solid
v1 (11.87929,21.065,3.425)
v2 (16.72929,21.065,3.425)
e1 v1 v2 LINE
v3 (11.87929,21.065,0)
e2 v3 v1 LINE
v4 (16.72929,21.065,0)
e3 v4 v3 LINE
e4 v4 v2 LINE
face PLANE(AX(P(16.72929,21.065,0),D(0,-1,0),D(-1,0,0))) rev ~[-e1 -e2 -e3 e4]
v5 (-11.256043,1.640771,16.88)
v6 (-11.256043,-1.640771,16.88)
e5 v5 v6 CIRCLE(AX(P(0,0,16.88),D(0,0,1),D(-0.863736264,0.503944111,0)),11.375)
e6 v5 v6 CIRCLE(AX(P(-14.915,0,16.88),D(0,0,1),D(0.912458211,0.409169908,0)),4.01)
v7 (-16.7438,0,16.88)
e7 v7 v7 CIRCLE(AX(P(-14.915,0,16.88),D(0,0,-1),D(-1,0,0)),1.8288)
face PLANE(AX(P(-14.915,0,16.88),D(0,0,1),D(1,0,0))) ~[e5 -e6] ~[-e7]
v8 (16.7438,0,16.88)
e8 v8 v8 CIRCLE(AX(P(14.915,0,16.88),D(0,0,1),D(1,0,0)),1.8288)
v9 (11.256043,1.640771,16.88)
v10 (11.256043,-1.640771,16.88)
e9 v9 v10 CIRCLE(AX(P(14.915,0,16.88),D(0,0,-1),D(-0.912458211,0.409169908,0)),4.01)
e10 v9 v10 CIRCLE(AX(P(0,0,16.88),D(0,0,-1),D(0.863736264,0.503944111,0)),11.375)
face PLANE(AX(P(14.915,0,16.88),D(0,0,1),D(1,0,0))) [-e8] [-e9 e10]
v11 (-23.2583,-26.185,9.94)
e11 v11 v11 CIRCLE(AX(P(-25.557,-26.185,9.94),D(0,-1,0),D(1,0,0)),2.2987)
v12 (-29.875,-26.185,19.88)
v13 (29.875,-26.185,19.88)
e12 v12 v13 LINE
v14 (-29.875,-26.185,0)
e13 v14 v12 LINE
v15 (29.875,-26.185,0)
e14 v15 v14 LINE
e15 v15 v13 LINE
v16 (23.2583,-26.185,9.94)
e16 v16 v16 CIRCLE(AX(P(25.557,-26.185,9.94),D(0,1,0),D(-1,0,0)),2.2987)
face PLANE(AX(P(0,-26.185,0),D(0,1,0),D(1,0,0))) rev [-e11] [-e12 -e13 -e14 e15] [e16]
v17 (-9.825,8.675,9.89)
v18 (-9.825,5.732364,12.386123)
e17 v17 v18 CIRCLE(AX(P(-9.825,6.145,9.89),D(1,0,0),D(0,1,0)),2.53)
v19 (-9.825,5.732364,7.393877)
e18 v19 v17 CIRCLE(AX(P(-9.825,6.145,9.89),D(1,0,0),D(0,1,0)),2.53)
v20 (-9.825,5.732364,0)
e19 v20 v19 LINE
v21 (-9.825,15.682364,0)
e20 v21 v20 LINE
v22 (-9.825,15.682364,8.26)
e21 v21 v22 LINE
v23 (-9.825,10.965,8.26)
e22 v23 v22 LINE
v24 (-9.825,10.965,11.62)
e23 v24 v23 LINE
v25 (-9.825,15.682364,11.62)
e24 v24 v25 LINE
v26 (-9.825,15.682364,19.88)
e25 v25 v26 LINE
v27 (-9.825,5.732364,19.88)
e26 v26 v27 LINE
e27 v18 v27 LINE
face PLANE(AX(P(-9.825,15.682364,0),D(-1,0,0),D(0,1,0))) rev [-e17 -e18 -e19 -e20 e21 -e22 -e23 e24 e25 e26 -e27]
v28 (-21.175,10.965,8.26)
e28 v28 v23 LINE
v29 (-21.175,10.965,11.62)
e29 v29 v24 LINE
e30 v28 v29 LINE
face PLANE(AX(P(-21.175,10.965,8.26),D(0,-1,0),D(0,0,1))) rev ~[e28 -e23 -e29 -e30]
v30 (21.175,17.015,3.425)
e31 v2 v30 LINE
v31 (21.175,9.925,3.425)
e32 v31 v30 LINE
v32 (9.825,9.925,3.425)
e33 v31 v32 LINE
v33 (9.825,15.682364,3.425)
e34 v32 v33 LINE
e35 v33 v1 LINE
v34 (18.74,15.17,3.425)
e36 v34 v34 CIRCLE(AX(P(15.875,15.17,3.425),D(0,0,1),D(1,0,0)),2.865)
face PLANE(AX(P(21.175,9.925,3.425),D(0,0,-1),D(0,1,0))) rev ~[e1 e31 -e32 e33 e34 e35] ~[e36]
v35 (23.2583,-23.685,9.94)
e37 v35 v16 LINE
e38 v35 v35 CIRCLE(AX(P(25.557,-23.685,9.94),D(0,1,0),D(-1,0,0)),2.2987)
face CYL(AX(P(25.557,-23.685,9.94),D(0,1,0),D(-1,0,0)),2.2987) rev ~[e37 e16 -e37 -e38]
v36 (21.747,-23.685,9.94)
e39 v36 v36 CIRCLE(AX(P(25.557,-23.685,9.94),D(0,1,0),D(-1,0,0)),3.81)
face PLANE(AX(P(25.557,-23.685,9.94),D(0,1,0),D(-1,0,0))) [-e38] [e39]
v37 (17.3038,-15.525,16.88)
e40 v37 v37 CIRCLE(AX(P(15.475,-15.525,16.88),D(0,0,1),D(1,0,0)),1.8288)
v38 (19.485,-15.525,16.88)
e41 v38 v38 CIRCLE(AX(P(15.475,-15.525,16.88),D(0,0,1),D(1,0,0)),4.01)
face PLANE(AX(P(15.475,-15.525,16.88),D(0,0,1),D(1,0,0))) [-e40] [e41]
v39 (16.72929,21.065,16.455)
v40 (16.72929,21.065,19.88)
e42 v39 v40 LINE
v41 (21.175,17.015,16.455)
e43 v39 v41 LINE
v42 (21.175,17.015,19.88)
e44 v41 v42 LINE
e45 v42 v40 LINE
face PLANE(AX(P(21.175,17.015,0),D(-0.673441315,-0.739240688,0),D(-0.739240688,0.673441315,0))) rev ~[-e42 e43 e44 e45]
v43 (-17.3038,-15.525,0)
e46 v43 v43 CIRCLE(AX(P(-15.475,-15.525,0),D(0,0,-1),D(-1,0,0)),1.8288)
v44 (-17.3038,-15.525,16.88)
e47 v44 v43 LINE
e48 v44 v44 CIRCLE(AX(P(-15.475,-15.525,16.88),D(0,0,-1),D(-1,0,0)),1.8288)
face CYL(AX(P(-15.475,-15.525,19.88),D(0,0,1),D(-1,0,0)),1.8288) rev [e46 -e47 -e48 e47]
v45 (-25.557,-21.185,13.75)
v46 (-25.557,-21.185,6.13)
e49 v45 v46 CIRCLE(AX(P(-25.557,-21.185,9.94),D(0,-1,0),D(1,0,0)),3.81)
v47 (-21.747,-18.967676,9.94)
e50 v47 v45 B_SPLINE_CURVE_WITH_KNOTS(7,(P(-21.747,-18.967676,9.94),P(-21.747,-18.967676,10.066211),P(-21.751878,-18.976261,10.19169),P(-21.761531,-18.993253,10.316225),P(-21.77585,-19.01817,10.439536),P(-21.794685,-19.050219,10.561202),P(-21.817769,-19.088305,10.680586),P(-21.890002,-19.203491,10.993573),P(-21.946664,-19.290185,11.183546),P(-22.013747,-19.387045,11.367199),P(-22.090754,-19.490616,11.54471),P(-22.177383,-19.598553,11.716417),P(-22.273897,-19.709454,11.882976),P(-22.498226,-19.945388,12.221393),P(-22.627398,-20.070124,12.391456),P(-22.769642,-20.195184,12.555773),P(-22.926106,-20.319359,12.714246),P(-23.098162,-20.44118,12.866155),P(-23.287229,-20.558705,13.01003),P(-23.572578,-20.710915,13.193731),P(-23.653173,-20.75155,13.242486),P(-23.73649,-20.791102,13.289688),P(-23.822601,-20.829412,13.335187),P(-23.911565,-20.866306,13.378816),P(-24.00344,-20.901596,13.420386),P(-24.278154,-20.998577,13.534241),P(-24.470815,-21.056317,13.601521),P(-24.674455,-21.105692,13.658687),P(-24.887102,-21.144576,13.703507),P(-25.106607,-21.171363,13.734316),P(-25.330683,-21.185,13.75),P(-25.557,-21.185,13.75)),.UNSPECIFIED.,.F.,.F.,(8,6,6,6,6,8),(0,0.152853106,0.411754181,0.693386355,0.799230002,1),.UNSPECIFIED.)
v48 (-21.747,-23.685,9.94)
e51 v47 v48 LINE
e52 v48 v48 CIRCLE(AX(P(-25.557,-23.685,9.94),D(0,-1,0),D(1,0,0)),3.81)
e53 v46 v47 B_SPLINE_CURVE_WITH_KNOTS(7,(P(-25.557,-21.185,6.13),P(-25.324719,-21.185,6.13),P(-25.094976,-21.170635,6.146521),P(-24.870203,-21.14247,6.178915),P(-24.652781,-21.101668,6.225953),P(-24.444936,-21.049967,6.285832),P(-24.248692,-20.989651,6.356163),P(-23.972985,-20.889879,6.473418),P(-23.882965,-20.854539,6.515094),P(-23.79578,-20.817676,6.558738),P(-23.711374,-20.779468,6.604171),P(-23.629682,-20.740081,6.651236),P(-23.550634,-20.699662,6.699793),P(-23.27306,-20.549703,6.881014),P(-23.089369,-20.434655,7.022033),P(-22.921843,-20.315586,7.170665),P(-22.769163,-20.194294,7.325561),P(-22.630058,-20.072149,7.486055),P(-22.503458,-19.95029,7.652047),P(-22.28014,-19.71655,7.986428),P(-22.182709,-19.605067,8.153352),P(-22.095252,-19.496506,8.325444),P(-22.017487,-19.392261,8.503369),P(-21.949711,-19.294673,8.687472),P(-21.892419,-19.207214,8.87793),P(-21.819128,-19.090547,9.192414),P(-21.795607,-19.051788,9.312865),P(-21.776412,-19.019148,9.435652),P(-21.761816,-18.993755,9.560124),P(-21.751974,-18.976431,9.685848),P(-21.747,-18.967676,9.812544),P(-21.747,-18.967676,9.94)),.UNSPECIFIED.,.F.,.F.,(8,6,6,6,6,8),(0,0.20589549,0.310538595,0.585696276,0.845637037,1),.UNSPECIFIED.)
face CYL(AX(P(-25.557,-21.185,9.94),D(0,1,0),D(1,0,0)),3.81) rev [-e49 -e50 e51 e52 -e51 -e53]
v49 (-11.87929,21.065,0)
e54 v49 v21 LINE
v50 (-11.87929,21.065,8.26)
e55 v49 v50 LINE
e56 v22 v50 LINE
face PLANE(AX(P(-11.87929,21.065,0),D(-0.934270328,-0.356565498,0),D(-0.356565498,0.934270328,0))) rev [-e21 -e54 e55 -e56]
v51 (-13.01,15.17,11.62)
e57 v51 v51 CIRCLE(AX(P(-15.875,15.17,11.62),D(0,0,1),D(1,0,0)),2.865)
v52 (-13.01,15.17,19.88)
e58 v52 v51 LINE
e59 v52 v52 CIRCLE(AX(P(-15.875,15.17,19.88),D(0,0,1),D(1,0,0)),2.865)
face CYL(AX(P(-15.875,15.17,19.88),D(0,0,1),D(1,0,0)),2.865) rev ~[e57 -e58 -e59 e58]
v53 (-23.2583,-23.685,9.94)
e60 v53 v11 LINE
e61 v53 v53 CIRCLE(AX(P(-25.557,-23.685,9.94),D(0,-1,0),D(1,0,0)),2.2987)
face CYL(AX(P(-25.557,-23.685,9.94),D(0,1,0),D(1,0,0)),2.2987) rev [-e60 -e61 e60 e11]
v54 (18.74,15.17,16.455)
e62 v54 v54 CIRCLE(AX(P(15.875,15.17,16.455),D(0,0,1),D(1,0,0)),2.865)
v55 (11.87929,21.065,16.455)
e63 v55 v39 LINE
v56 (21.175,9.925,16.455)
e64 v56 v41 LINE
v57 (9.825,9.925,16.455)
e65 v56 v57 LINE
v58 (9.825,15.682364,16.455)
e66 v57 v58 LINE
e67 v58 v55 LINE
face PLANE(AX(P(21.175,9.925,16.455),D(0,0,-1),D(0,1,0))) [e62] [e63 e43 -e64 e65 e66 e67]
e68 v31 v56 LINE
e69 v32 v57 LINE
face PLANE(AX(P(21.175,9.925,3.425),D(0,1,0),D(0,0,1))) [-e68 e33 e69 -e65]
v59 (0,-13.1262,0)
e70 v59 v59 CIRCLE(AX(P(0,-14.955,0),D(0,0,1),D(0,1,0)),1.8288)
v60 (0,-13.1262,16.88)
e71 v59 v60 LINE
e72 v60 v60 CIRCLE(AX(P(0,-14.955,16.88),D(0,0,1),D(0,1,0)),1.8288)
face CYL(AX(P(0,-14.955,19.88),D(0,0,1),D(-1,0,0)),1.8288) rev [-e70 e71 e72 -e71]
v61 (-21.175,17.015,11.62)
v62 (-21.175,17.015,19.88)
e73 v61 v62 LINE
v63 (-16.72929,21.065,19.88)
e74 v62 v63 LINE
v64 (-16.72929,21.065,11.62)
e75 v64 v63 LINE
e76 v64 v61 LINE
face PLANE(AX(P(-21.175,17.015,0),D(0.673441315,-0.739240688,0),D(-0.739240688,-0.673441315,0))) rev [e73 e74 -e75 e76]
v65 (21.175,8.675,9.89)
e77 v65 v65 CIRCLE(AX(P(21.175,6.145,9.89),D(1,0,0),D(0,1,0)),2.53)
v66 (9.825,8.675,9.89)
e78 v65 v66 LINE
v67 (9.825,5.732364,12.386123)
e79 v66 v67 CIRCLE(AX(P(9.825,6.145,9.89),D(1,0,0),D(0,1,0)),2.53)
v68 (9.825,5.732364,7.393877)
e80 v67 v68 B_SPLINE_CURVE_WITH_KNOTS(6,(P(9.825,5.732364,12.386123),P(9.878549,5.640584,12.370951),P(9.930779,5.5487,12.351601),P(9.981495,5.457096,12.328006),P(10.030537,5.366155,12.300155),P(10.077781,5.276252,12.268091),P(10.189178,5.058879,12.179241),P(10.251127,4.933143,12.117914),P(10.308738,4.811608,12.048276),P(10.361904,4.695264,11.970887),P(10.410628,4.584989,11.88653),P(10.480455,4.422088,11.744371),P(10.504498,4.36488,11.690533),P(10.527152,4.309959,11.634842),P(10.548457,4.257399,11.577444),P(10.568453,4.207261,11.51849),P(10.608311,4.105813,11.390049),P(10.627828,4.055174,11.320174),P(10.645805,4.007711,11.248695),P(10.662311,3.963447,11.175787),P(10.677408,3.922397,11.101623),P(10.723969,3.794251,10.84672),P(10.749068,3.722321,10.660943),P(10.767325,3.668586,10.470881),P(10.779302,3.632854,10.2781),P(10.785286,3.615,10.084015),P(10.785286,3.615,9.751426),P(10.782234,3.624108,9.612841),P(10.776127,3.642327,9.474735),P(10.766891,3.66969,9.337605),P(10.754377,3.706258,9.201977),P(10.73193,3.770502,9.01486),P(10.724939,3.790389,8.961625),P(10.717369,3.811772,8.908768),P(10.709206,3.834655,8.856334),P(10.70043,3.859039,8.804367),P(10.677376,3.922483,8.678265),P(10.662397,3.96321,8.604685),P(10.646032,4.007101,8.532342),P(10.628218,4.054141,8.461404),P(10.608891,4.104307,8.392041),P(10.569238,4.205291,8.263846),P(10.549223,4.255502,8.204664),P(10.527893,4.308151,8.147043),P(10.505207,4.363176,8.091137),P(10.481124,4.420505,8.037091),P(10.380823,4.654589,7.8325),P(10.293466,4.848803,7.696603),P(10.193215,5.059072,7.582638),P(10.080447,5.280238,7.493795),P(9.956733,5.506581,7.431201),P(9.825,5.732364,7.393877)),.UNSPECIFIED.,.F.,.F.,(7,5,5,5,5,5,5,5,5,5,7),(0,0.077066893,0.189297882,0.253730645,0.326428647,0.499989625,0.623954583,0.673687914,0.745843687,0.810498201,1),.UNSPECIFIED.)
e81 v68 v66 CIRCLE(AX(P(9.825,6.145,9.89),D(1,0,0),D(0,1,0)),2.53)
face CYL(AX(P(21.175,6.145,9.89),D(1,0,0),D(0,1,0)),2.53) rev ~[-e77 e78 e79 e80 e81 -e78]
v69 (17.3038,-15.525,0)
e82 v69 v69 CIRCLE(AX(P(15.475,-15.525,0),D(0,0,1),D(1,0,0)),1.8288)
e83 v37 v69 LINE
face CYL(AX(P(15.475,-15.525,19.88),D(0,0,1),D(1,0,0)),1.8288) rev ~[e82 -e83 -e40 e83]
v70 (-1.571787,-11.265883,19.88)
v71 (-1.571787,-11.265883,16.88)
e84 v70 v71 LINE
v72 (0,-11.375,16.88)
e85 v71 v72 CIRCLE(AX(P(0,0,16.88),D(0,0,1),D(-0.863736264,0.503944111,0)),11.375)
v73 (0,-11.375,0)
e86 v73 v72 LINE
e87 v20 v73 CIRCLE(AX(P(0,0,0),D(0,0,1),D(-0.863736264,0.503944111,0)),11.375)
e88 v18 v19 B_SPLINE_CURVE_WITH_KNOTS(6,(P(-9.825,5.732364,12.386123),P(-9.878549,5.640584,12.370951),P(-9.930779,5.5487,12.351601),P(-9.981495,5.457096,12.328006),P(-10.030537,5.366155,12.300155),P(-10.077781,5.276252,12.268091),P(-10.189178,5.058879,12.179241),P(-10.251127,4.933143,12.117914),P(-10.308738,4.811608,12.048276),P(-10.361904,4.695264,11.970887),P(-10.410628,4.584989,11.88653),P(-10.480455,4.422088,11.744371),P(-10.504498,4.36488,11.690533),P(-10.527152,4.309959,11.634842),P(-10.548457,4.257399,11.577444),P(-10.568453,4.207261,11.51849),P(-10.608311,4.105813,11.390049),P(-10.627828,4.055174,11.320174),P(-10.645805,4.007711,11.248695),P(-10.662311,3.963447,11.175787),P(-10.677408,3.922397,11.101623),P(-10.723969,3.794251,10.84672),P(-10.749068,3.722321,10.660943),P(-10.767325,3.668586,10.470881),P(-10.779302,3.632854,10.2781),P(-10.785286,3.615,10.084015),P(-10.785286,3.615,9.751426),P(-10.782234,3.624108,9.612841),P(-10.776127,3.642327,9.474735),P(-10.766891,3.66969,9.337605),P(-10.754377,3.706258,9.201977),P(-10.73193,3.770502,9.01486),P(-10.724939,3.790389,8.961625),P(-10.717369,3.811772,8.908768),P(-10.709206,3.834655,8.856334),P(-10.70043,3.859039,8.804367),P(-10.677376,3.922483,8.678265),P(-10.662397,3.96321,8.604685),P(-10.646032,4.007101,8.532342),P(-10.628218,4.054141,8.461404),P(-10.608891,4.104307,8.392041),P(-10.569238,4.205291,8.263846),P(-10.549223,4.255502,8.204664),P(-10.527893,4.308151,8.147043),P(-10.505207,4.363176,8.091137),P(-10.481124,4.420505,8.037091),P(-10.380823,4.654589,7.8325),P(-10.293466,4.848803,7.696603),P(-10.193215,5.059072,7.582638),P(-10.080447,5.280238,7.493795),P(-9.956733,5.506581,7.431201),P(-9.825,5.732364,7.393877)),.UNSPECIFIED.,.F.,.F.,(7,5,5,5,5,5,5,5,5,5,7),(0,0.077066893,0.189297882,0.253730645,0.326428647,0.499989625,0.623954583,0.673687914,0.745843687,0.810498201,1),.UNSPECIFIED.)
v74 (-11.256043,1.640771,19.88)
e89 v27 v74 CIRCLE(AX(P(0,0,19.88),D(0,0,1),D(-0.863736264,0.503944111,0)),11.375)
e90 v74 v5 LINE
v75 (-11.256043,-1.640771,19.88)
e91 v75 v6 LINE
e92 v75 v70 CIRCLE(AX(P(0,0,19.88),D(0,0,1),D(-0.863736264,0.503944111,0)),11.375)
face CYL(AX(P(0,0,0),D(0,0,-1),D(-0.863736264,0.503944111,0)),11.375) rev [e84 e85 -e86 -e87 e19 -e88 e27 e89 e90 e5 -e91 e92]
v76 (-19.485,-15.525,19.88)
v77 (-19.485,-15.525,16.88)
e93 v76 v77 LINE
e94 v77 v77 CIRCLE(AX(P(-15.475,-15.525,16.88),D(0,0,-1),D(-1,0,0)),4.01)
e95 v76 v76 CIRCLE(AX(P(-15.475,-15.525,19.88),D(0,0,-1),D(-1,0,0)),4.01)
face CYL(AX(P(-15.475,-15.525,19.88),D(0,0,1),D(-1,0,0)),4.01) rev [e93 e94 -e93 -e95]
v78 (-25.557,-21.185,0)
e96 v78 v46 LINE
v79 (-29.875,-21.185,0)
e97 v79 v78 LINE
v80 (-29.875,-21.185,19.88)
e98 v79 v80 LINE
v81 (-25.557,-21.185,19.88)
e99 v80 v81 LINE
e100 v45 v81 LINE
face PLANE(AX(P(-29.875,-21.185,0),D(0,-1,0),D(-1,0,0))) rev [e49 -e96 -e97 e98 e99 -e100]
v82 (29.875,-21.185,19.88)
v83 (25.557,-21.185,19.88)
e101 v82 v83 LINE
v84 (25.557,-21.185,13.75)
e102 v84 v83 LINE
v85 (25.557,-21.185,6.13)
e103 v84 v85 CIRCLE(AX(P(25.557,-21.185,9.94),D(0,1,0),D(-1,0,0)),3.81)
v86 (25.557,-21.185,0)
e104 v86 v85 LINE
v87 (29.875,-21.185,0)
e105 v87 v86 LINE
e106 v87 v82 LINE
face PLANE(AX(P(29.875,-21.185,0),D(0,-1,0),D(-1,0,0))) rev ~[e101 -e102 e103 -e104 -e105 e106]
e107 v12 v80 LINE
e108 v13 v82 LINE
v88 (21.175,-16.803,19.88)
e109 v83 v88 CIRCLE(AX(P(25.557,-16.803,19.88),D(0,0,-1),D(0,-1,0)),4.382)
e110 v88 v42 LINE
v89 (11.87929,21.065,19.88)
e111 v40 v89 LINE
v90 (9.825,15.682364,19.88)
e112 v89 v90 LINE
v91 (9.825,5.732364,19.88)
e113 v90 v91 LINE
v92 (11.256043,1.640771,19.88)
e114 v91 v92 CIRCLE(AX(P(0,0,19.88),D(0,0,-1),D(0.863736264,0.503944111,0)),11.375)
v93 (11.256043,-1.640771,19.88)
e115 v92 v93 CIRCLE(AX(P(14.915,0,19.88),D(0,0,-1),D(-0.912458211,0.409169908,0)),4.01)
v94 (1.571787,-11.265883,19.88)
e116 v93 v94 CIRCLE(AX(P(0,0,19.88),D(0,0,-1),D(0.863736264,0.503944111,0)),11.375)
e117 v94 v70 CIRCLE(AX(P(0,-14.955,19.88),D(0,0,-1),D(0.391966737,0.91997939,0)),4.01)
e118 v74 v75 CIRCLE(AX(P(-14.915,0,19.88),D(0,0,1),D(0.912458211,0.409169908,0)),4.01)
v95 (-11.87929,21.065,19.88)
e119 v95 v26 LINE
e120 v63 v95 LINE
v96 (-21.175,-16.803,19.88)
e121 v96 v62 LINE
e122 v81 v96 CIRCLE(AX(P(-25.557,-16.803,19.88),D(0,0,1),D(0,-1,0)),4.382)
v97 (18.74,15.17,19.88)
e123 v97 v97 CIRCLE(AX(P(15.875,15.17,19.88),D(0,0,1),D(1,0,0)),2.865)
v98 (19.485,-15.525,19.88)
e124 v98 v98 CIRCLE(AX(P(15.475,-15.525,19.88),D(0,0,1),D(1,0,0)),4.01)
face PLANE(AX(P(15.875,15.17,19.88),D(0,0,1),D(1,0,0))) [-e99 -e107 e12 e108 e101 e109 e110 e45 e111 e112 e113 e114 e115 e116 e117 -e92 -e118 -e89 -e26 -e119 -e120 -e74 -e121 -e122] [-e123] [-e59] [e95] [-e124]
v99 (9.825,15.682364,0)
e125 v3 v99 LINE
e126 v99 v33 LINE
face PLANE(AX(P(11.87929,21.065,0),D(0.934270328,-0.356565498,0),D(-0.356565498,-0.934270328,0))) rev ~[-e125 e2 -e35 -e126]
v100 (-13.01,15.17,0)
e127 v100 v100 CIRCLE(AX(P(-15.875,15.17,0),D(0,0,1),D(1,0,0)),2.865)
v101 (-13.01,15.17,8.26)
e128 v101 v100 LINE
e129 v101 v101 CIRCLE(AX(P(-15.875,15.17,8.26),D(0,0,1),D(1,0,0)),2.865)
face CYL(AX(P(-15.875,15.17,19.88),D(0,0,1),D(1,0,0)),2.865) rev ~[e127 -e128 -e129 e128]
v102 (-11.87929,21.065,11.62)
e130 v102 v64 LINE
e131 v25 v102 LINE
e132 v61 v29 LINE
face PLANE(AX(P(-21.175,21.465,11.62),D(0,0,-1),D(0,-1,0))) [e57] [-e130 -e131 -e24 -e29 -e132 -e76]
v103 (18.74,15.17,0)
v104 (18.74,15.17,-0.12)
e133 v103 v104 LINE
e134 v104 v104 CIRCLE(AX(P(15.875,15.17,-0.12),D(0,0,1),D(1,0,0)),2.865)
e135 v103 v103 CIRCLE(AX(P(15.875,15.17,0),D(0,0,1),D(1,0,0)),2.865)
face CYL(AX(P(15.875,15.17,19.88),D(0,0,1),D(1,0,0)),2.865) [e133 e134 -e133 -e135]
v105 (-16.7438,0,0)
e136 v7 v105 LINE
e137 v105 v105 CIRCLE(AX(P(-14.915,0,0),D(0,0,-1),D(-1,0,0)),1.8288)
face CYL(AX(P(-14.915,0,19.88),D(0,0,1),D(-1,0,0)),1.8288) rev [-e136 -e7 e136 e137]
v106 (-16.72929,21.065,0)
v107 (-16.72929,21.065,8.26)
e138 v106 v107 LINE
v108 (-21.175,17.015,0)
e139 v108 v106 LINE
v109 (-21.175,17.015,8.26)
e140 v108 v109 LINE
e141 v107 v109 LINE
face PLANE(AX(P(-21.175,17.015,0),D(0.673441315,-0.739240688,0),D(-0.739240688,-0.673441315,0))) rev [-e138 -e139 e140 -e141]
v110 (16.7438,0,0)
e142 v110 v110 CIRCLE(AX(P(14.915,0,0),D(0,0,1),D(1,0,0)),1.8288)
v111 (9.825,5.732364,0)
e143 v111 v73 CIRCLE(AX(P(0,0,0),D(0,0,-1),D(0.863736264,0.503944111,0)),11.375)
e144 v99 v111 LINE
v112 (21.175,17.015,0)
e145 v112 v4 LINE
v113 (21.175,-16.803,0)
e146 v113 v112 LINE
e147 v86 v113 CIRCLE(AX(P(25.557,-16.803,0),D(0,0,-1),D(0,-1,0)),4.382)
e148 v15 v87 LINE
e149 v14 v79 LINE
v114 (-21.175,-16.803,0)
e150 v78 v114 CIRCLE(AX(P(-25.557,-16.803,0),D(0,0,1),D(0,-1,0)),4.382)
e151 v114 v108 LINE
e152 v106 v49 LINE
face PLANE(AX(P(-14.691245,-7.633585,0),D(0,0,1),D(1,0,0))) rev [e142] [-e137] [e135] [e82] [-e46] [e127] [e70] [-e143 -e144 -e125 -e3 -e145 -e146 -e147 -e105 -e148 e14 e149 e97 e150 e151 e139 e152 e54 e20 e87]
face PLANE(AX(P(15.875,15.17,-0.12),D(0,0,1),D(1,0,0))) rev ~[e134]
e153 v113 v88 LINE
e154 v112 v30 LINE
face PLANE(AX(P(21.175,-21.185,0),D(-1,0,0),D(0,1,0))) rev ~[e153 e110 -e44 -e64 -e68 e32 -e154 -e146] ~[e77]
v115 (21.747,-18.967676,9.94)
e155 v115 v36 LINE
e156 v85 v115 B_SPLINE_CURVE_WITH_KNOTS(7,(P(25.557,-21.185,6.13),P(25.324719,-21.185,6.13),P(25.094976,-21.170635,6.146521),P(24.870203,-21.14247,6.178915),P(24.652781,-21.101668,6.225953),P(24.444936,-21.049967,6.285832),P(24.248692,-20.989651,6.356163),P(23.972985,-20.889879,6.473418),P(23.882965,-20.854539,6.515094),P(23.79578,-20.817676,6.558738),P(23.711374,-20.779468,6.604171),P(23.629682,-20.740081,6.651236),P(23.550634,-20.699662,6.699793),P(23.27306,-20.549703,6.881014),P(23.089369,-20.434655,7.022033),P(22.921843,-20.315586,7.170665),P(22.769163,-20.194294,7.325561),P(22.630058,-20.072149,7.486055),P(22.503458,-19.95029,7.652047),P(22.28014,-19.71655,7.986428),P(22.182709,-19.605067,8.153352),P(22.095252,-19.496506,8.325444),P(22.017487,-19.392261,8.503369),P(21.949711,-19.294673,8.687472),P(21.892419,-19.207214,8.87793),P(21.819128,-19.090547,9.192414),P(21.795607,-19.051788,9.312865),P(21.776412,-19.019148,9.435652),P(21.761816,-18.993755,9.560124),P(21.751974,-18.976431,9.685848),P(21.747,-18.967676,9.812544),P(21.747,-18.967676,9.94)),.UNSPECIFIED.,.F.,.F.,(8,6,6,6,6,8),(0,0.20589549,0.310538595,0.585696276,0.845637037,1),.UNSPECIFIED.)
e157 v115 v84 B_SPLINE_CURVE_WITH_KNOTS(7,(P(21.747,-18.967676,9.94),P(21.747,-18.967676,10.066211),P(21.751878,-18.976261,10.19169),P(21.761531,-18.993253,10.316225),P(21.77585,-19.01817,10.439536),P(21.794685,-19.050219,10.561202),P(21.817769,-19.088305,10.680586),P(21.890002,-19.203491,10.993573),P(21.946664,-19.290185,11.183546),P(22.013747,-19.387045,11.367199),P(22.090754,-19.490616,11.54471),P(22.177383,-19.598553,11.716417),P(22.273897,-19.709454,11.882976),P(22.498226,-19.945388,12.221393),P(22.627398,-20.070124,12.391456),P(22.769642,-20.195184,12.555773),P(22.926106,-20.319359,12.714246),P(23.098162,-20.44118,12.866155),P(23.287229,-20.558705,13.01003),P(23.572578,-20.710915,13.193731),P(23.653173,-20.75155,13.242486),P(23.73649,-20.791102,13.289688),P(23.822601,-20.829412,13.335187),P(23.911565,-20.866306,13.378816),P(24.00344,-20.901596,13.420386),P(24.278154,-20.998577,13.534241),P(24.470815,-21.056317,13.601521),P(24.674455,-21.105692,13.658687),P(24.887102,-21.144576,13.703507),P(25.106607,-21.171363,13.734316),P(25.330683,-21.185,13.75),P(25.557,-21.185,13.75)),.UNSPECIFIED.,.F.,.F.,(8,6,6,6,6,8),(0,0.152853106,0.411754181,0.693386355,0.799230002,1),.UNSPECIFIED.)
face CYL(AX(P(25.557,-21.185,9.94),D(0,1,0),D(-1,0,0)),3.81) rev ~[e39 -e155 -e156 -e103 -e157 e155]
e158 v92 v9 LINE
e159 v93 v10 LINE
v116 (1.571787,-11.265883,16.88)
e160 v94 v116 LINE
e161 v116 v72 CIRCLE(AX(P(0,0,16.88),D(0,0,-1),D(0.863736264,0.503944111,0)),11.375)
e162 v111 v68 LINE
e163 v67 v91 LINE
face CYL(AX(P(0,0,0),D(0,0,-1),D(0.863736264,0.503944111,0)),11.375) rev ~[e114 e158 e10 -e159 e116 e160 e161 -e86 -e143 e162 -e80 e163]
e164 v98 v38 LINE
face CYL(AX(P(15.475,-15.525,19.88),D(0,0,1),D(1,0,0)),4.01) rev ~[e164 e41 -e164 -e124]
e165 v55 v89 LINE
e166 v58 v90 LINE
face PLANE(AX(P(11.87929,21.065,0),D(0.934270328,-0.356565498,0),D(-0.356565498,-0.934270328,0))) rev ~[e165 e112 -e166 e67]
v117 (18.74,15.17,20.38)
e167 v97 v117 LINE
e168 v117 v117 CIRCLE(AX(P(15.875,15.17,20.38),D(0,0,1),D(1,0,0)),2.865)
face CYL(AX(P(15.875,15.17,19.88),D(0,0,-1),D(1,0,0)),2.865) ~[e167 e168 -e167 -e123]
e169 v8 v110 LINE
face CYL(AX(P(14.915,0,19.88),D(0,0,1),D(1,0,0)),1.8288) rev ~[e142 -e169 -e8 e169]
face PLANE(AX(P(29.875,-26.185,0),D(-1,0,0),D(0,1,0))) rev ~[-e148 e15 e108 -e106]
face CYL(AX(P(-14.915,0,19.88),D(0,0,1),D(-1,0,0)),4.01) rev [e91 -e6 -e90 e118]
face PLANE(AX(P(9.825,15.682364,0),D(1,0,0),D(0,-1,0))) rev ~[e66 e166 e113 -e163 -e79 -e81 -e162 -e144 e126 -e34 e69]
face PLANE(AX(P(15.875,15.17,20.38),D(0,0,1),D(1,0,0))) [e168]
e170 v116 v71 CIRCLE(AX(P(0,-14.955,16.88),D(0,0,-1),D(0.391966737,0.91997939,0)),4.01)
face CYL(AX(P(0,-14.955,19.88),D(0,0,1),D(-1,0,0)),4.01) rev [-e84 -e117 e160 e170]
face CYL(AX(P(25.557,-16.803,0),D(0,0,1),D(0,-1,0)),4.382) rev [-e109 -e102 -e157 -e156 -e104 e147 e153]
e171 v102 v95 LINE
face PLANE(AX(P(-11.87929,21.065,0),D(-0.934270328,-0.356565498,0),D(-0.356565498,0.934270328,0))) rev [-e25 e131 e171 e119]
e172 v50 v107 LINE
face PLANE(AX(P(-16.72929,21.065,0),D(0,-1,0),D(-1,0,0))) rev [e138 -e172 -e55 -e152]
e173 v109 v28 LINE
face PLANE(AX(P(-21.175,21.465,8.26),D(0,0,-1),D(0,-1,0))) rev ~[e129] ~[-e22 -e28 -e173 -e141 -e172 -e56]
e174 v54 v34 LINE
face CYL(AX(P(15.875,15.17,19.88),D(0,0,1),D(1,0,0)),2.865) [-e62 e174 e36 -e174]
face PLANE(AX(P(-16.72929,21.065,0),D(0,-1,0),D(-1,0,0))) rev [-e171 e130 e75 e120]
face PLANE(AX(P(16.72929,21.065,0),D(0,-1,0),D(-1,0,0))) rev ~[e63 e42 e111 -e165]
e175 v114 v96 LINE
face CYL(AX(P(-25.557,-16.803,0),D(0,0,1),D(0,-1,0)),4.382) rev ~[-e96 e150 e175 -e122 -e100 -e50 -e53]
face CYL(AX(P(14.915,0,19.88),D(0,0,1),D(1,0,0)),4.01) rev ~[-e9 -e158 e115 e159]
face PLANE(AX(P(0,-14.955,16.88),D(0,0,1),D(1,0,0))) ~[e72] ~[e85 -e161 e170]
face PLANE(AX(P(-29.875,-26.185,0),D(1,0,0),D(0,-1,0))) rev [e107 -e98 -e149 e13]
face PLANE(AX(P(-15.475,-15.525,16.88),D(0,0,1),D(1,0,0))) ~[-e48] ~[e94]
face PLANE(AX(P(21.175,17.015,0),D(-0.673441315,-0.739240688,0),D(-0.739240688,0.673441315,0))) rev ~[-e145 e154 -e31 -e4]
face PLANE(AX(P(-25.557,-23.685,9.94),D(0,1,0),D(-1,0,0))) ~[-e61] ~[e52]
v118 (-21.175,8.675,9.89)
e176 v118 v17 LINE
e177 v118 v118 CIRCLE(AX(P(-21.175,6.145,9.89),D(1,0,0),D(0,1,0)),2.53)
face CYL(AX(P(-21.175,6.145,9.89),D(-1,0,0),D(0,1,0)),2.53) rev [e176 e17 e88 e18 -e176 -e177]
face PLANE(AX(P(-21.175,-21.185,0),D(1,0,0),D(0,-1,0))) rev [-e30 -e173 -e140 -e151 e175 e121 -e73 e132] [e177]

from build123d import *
from build123d import SkipClean  # not in build123d's __all__

# Parameters (mm, degrees)
F1_DEPTH       = 19.88
F2_R           = 4.382
F3_R           = 3.81
F4_DEPTH       = 2.5
F4_DEPTH_BACK  = 5
F5_R           = 2.2987
F6_DEPTH       = 2.501
F7_R           = 4.01
F8_DEPTH       = 3
F9_R           = 1.8288
F10_DEPTH      = 19.8810001
F11_R          = 2.53
F12_DEPTH      = 21.176
F14_W          = 12.0765847373
F14_H          = 13.03
F15_DEPTH      = 11.351
F16_W          = 10.5
F16_H          = 3.36
F17_DEPTH      = 11.351
F18_R          = 2.865
F19_DEPTH      = 20
F19_DEPTH_BACK = 0.5
F20_R          = 2.865
F21_DEPTH      = 20.001


# Not quite as in the source:
# - after a boolean that leaves OpenCascade's solid faulty, fix() repairs it


with BuildPart() as f1:
    # F0 (on Top) → F1 (new body)
    with BuildSketch(Plane.XY):
        with BuildLine():
            Line((0, -11.375), (0, -26.185))
            Line((0, -26.185), (29.875, -26.185))
            Line((29.875, -26.185), (29.875, -21.185))
            Line((29.875, -21.185), (21.175, -21.185))
            Line((21.175, -21.185), (21.175, 17.015))
            Line((21.175, 17.015), (16.7292900036, 21.065))
            Line((16.7292900036, 21.065), (11.8792900036, 21.065))
            Line((11.8792900036, 21.065), (9.825, 15.6823642592))
            Line((9.825, 15.6823642592), (9.825, 5.7323642592))
            ThreePointArc((9.825, 5.7323642592), (9.8639816618, -5.6650234577), (0, -11.375))
        make_face()
    extrude(amount=F1_DEPTH)

    # F2
    f2_edges = [f1.edges().sort_by_distance(p)[0] for p in [
        (21.175, -21.185, 9.94),
    ]]
    fillet(f2_edges, radius=F2_R)

    # F3 (on face) → F4 (cut, two sides)
    with BuildSketch(Plane(origin=(0, -21.185, 0), x_dir=(-1, 0, 0), z_dir=(0, 1, 0))) as f4_sk:
        with Locations((-25.557, 9.94)):
            Circle(F3_R)
    extrude(amount=-F4_DEPTH, mode=Mode.SUBTRACT)
    extrude(f4_sk.sketch, amount=F4_DEPTH_BACK, mode=Mode.SUBTRACT)

    # F5 (on face) → F6 (cut, through all)
    with BuildSketch(Plane(origin=(0, -23.685, 0), x_dir=(-1, 0, 0), z_dir=(0, 1, 0))):
        with Locations((-25.557, 9.94)):
            Circle(F5_R)
    extrude(amount=-F6_DEPTH, mode=Mode.SUBTRACT)

    # F7 (on face) → F8 (cut)
    with BuildSketch(Plane.XY.offset(19.88)):
        with Locations((15.475, -15.525)):
            Circle(F7_R)
        with Locations((0, -14.955)):
            Circle(F7_R)
        with Locations((14.915, 0)):
            Circle(F7_R)
    extrude(amount=-F8_DEPTH, mode=Mode.SUBTRACT)

    # F9 (on face) → F10 (cut, through all)
    with BuildSketch(Plane.XY.offset(19.88)):
        with Locations((14.915, 0)):
            Circle(F9_R)
        with Locations((15.475, -15.525)):
            Circle(F9_R)
        with Locations((0, -14.955)):
            Circle(F9_R)
    extrude(amount=-F10_DEPTH, mode=Mode.SUBTRACT)

    # F11 (on face) → F12 (cut, through all)
    with BuildSketch(Plane.YZ.offset(21.175)):
        with Locations((6.145, 9.89)):
            Circle(F11_R)
    extrude(amount=-F12_DEPTH, mode=Mode.SUBTRACT)

    # F13: F1 across plane


with BuildPart() as f1_1:
    add(f1.part, clean=False)
    with SkipClean():  # cleaning this boolean's faces spoils the solid; the shape is the same uncleaned
        add(f1.part.mirror(Plane.YZ), clean=False)

    # F14 (on face) → F15 (cut, through all)
    with BuildSketch(Plane.YZ.offset(21.175)):
        with Locations((15.9632923686, 9.94)):
            Rectangle(F14_W, F14_H)
    extrude(amount=-F15_DEPTH, mode=Mode.SUBTRACT)

    add(f1_1.part.fix(), mode=Mode.REPLACE)

    # F16 (on face) → F17 (cut, through all)
    with BuildSketch(Plane(origin=(-21.175, 0, 0), x_dir=(0, -1, 0), z_dir=(-1, 0, 0))):
        with Locations((-16.215, 9.94)):
            Rectangle(F16_W, F16_H)
    extrude(amount=-F17_DEPTH, mode=Mode.SUBTRACT)

    # F18 (on face) → F19 (join, two sides)
    with BuildSketch(Plane.XY.offset(19.88)) as f19_sk:
        with Locations((15.875, 15.17)):
            Circle(F18_R)
    extrude(amount=-F19_DEPTH)
    extrude(f19_sk.sketch, amount=F19_DEPTH_BACK)

    # F20 (on face) → F21 (cut, through all)
    with BuildSketch(Plane.XY.offset(19.88)):
        with Locations((-15.875, 15.17)):
            Circle(F20_R)
    extrude(amount=-F21_DEPTH, mode=Mode.SUBTRACT)


solid = f1_1.part
